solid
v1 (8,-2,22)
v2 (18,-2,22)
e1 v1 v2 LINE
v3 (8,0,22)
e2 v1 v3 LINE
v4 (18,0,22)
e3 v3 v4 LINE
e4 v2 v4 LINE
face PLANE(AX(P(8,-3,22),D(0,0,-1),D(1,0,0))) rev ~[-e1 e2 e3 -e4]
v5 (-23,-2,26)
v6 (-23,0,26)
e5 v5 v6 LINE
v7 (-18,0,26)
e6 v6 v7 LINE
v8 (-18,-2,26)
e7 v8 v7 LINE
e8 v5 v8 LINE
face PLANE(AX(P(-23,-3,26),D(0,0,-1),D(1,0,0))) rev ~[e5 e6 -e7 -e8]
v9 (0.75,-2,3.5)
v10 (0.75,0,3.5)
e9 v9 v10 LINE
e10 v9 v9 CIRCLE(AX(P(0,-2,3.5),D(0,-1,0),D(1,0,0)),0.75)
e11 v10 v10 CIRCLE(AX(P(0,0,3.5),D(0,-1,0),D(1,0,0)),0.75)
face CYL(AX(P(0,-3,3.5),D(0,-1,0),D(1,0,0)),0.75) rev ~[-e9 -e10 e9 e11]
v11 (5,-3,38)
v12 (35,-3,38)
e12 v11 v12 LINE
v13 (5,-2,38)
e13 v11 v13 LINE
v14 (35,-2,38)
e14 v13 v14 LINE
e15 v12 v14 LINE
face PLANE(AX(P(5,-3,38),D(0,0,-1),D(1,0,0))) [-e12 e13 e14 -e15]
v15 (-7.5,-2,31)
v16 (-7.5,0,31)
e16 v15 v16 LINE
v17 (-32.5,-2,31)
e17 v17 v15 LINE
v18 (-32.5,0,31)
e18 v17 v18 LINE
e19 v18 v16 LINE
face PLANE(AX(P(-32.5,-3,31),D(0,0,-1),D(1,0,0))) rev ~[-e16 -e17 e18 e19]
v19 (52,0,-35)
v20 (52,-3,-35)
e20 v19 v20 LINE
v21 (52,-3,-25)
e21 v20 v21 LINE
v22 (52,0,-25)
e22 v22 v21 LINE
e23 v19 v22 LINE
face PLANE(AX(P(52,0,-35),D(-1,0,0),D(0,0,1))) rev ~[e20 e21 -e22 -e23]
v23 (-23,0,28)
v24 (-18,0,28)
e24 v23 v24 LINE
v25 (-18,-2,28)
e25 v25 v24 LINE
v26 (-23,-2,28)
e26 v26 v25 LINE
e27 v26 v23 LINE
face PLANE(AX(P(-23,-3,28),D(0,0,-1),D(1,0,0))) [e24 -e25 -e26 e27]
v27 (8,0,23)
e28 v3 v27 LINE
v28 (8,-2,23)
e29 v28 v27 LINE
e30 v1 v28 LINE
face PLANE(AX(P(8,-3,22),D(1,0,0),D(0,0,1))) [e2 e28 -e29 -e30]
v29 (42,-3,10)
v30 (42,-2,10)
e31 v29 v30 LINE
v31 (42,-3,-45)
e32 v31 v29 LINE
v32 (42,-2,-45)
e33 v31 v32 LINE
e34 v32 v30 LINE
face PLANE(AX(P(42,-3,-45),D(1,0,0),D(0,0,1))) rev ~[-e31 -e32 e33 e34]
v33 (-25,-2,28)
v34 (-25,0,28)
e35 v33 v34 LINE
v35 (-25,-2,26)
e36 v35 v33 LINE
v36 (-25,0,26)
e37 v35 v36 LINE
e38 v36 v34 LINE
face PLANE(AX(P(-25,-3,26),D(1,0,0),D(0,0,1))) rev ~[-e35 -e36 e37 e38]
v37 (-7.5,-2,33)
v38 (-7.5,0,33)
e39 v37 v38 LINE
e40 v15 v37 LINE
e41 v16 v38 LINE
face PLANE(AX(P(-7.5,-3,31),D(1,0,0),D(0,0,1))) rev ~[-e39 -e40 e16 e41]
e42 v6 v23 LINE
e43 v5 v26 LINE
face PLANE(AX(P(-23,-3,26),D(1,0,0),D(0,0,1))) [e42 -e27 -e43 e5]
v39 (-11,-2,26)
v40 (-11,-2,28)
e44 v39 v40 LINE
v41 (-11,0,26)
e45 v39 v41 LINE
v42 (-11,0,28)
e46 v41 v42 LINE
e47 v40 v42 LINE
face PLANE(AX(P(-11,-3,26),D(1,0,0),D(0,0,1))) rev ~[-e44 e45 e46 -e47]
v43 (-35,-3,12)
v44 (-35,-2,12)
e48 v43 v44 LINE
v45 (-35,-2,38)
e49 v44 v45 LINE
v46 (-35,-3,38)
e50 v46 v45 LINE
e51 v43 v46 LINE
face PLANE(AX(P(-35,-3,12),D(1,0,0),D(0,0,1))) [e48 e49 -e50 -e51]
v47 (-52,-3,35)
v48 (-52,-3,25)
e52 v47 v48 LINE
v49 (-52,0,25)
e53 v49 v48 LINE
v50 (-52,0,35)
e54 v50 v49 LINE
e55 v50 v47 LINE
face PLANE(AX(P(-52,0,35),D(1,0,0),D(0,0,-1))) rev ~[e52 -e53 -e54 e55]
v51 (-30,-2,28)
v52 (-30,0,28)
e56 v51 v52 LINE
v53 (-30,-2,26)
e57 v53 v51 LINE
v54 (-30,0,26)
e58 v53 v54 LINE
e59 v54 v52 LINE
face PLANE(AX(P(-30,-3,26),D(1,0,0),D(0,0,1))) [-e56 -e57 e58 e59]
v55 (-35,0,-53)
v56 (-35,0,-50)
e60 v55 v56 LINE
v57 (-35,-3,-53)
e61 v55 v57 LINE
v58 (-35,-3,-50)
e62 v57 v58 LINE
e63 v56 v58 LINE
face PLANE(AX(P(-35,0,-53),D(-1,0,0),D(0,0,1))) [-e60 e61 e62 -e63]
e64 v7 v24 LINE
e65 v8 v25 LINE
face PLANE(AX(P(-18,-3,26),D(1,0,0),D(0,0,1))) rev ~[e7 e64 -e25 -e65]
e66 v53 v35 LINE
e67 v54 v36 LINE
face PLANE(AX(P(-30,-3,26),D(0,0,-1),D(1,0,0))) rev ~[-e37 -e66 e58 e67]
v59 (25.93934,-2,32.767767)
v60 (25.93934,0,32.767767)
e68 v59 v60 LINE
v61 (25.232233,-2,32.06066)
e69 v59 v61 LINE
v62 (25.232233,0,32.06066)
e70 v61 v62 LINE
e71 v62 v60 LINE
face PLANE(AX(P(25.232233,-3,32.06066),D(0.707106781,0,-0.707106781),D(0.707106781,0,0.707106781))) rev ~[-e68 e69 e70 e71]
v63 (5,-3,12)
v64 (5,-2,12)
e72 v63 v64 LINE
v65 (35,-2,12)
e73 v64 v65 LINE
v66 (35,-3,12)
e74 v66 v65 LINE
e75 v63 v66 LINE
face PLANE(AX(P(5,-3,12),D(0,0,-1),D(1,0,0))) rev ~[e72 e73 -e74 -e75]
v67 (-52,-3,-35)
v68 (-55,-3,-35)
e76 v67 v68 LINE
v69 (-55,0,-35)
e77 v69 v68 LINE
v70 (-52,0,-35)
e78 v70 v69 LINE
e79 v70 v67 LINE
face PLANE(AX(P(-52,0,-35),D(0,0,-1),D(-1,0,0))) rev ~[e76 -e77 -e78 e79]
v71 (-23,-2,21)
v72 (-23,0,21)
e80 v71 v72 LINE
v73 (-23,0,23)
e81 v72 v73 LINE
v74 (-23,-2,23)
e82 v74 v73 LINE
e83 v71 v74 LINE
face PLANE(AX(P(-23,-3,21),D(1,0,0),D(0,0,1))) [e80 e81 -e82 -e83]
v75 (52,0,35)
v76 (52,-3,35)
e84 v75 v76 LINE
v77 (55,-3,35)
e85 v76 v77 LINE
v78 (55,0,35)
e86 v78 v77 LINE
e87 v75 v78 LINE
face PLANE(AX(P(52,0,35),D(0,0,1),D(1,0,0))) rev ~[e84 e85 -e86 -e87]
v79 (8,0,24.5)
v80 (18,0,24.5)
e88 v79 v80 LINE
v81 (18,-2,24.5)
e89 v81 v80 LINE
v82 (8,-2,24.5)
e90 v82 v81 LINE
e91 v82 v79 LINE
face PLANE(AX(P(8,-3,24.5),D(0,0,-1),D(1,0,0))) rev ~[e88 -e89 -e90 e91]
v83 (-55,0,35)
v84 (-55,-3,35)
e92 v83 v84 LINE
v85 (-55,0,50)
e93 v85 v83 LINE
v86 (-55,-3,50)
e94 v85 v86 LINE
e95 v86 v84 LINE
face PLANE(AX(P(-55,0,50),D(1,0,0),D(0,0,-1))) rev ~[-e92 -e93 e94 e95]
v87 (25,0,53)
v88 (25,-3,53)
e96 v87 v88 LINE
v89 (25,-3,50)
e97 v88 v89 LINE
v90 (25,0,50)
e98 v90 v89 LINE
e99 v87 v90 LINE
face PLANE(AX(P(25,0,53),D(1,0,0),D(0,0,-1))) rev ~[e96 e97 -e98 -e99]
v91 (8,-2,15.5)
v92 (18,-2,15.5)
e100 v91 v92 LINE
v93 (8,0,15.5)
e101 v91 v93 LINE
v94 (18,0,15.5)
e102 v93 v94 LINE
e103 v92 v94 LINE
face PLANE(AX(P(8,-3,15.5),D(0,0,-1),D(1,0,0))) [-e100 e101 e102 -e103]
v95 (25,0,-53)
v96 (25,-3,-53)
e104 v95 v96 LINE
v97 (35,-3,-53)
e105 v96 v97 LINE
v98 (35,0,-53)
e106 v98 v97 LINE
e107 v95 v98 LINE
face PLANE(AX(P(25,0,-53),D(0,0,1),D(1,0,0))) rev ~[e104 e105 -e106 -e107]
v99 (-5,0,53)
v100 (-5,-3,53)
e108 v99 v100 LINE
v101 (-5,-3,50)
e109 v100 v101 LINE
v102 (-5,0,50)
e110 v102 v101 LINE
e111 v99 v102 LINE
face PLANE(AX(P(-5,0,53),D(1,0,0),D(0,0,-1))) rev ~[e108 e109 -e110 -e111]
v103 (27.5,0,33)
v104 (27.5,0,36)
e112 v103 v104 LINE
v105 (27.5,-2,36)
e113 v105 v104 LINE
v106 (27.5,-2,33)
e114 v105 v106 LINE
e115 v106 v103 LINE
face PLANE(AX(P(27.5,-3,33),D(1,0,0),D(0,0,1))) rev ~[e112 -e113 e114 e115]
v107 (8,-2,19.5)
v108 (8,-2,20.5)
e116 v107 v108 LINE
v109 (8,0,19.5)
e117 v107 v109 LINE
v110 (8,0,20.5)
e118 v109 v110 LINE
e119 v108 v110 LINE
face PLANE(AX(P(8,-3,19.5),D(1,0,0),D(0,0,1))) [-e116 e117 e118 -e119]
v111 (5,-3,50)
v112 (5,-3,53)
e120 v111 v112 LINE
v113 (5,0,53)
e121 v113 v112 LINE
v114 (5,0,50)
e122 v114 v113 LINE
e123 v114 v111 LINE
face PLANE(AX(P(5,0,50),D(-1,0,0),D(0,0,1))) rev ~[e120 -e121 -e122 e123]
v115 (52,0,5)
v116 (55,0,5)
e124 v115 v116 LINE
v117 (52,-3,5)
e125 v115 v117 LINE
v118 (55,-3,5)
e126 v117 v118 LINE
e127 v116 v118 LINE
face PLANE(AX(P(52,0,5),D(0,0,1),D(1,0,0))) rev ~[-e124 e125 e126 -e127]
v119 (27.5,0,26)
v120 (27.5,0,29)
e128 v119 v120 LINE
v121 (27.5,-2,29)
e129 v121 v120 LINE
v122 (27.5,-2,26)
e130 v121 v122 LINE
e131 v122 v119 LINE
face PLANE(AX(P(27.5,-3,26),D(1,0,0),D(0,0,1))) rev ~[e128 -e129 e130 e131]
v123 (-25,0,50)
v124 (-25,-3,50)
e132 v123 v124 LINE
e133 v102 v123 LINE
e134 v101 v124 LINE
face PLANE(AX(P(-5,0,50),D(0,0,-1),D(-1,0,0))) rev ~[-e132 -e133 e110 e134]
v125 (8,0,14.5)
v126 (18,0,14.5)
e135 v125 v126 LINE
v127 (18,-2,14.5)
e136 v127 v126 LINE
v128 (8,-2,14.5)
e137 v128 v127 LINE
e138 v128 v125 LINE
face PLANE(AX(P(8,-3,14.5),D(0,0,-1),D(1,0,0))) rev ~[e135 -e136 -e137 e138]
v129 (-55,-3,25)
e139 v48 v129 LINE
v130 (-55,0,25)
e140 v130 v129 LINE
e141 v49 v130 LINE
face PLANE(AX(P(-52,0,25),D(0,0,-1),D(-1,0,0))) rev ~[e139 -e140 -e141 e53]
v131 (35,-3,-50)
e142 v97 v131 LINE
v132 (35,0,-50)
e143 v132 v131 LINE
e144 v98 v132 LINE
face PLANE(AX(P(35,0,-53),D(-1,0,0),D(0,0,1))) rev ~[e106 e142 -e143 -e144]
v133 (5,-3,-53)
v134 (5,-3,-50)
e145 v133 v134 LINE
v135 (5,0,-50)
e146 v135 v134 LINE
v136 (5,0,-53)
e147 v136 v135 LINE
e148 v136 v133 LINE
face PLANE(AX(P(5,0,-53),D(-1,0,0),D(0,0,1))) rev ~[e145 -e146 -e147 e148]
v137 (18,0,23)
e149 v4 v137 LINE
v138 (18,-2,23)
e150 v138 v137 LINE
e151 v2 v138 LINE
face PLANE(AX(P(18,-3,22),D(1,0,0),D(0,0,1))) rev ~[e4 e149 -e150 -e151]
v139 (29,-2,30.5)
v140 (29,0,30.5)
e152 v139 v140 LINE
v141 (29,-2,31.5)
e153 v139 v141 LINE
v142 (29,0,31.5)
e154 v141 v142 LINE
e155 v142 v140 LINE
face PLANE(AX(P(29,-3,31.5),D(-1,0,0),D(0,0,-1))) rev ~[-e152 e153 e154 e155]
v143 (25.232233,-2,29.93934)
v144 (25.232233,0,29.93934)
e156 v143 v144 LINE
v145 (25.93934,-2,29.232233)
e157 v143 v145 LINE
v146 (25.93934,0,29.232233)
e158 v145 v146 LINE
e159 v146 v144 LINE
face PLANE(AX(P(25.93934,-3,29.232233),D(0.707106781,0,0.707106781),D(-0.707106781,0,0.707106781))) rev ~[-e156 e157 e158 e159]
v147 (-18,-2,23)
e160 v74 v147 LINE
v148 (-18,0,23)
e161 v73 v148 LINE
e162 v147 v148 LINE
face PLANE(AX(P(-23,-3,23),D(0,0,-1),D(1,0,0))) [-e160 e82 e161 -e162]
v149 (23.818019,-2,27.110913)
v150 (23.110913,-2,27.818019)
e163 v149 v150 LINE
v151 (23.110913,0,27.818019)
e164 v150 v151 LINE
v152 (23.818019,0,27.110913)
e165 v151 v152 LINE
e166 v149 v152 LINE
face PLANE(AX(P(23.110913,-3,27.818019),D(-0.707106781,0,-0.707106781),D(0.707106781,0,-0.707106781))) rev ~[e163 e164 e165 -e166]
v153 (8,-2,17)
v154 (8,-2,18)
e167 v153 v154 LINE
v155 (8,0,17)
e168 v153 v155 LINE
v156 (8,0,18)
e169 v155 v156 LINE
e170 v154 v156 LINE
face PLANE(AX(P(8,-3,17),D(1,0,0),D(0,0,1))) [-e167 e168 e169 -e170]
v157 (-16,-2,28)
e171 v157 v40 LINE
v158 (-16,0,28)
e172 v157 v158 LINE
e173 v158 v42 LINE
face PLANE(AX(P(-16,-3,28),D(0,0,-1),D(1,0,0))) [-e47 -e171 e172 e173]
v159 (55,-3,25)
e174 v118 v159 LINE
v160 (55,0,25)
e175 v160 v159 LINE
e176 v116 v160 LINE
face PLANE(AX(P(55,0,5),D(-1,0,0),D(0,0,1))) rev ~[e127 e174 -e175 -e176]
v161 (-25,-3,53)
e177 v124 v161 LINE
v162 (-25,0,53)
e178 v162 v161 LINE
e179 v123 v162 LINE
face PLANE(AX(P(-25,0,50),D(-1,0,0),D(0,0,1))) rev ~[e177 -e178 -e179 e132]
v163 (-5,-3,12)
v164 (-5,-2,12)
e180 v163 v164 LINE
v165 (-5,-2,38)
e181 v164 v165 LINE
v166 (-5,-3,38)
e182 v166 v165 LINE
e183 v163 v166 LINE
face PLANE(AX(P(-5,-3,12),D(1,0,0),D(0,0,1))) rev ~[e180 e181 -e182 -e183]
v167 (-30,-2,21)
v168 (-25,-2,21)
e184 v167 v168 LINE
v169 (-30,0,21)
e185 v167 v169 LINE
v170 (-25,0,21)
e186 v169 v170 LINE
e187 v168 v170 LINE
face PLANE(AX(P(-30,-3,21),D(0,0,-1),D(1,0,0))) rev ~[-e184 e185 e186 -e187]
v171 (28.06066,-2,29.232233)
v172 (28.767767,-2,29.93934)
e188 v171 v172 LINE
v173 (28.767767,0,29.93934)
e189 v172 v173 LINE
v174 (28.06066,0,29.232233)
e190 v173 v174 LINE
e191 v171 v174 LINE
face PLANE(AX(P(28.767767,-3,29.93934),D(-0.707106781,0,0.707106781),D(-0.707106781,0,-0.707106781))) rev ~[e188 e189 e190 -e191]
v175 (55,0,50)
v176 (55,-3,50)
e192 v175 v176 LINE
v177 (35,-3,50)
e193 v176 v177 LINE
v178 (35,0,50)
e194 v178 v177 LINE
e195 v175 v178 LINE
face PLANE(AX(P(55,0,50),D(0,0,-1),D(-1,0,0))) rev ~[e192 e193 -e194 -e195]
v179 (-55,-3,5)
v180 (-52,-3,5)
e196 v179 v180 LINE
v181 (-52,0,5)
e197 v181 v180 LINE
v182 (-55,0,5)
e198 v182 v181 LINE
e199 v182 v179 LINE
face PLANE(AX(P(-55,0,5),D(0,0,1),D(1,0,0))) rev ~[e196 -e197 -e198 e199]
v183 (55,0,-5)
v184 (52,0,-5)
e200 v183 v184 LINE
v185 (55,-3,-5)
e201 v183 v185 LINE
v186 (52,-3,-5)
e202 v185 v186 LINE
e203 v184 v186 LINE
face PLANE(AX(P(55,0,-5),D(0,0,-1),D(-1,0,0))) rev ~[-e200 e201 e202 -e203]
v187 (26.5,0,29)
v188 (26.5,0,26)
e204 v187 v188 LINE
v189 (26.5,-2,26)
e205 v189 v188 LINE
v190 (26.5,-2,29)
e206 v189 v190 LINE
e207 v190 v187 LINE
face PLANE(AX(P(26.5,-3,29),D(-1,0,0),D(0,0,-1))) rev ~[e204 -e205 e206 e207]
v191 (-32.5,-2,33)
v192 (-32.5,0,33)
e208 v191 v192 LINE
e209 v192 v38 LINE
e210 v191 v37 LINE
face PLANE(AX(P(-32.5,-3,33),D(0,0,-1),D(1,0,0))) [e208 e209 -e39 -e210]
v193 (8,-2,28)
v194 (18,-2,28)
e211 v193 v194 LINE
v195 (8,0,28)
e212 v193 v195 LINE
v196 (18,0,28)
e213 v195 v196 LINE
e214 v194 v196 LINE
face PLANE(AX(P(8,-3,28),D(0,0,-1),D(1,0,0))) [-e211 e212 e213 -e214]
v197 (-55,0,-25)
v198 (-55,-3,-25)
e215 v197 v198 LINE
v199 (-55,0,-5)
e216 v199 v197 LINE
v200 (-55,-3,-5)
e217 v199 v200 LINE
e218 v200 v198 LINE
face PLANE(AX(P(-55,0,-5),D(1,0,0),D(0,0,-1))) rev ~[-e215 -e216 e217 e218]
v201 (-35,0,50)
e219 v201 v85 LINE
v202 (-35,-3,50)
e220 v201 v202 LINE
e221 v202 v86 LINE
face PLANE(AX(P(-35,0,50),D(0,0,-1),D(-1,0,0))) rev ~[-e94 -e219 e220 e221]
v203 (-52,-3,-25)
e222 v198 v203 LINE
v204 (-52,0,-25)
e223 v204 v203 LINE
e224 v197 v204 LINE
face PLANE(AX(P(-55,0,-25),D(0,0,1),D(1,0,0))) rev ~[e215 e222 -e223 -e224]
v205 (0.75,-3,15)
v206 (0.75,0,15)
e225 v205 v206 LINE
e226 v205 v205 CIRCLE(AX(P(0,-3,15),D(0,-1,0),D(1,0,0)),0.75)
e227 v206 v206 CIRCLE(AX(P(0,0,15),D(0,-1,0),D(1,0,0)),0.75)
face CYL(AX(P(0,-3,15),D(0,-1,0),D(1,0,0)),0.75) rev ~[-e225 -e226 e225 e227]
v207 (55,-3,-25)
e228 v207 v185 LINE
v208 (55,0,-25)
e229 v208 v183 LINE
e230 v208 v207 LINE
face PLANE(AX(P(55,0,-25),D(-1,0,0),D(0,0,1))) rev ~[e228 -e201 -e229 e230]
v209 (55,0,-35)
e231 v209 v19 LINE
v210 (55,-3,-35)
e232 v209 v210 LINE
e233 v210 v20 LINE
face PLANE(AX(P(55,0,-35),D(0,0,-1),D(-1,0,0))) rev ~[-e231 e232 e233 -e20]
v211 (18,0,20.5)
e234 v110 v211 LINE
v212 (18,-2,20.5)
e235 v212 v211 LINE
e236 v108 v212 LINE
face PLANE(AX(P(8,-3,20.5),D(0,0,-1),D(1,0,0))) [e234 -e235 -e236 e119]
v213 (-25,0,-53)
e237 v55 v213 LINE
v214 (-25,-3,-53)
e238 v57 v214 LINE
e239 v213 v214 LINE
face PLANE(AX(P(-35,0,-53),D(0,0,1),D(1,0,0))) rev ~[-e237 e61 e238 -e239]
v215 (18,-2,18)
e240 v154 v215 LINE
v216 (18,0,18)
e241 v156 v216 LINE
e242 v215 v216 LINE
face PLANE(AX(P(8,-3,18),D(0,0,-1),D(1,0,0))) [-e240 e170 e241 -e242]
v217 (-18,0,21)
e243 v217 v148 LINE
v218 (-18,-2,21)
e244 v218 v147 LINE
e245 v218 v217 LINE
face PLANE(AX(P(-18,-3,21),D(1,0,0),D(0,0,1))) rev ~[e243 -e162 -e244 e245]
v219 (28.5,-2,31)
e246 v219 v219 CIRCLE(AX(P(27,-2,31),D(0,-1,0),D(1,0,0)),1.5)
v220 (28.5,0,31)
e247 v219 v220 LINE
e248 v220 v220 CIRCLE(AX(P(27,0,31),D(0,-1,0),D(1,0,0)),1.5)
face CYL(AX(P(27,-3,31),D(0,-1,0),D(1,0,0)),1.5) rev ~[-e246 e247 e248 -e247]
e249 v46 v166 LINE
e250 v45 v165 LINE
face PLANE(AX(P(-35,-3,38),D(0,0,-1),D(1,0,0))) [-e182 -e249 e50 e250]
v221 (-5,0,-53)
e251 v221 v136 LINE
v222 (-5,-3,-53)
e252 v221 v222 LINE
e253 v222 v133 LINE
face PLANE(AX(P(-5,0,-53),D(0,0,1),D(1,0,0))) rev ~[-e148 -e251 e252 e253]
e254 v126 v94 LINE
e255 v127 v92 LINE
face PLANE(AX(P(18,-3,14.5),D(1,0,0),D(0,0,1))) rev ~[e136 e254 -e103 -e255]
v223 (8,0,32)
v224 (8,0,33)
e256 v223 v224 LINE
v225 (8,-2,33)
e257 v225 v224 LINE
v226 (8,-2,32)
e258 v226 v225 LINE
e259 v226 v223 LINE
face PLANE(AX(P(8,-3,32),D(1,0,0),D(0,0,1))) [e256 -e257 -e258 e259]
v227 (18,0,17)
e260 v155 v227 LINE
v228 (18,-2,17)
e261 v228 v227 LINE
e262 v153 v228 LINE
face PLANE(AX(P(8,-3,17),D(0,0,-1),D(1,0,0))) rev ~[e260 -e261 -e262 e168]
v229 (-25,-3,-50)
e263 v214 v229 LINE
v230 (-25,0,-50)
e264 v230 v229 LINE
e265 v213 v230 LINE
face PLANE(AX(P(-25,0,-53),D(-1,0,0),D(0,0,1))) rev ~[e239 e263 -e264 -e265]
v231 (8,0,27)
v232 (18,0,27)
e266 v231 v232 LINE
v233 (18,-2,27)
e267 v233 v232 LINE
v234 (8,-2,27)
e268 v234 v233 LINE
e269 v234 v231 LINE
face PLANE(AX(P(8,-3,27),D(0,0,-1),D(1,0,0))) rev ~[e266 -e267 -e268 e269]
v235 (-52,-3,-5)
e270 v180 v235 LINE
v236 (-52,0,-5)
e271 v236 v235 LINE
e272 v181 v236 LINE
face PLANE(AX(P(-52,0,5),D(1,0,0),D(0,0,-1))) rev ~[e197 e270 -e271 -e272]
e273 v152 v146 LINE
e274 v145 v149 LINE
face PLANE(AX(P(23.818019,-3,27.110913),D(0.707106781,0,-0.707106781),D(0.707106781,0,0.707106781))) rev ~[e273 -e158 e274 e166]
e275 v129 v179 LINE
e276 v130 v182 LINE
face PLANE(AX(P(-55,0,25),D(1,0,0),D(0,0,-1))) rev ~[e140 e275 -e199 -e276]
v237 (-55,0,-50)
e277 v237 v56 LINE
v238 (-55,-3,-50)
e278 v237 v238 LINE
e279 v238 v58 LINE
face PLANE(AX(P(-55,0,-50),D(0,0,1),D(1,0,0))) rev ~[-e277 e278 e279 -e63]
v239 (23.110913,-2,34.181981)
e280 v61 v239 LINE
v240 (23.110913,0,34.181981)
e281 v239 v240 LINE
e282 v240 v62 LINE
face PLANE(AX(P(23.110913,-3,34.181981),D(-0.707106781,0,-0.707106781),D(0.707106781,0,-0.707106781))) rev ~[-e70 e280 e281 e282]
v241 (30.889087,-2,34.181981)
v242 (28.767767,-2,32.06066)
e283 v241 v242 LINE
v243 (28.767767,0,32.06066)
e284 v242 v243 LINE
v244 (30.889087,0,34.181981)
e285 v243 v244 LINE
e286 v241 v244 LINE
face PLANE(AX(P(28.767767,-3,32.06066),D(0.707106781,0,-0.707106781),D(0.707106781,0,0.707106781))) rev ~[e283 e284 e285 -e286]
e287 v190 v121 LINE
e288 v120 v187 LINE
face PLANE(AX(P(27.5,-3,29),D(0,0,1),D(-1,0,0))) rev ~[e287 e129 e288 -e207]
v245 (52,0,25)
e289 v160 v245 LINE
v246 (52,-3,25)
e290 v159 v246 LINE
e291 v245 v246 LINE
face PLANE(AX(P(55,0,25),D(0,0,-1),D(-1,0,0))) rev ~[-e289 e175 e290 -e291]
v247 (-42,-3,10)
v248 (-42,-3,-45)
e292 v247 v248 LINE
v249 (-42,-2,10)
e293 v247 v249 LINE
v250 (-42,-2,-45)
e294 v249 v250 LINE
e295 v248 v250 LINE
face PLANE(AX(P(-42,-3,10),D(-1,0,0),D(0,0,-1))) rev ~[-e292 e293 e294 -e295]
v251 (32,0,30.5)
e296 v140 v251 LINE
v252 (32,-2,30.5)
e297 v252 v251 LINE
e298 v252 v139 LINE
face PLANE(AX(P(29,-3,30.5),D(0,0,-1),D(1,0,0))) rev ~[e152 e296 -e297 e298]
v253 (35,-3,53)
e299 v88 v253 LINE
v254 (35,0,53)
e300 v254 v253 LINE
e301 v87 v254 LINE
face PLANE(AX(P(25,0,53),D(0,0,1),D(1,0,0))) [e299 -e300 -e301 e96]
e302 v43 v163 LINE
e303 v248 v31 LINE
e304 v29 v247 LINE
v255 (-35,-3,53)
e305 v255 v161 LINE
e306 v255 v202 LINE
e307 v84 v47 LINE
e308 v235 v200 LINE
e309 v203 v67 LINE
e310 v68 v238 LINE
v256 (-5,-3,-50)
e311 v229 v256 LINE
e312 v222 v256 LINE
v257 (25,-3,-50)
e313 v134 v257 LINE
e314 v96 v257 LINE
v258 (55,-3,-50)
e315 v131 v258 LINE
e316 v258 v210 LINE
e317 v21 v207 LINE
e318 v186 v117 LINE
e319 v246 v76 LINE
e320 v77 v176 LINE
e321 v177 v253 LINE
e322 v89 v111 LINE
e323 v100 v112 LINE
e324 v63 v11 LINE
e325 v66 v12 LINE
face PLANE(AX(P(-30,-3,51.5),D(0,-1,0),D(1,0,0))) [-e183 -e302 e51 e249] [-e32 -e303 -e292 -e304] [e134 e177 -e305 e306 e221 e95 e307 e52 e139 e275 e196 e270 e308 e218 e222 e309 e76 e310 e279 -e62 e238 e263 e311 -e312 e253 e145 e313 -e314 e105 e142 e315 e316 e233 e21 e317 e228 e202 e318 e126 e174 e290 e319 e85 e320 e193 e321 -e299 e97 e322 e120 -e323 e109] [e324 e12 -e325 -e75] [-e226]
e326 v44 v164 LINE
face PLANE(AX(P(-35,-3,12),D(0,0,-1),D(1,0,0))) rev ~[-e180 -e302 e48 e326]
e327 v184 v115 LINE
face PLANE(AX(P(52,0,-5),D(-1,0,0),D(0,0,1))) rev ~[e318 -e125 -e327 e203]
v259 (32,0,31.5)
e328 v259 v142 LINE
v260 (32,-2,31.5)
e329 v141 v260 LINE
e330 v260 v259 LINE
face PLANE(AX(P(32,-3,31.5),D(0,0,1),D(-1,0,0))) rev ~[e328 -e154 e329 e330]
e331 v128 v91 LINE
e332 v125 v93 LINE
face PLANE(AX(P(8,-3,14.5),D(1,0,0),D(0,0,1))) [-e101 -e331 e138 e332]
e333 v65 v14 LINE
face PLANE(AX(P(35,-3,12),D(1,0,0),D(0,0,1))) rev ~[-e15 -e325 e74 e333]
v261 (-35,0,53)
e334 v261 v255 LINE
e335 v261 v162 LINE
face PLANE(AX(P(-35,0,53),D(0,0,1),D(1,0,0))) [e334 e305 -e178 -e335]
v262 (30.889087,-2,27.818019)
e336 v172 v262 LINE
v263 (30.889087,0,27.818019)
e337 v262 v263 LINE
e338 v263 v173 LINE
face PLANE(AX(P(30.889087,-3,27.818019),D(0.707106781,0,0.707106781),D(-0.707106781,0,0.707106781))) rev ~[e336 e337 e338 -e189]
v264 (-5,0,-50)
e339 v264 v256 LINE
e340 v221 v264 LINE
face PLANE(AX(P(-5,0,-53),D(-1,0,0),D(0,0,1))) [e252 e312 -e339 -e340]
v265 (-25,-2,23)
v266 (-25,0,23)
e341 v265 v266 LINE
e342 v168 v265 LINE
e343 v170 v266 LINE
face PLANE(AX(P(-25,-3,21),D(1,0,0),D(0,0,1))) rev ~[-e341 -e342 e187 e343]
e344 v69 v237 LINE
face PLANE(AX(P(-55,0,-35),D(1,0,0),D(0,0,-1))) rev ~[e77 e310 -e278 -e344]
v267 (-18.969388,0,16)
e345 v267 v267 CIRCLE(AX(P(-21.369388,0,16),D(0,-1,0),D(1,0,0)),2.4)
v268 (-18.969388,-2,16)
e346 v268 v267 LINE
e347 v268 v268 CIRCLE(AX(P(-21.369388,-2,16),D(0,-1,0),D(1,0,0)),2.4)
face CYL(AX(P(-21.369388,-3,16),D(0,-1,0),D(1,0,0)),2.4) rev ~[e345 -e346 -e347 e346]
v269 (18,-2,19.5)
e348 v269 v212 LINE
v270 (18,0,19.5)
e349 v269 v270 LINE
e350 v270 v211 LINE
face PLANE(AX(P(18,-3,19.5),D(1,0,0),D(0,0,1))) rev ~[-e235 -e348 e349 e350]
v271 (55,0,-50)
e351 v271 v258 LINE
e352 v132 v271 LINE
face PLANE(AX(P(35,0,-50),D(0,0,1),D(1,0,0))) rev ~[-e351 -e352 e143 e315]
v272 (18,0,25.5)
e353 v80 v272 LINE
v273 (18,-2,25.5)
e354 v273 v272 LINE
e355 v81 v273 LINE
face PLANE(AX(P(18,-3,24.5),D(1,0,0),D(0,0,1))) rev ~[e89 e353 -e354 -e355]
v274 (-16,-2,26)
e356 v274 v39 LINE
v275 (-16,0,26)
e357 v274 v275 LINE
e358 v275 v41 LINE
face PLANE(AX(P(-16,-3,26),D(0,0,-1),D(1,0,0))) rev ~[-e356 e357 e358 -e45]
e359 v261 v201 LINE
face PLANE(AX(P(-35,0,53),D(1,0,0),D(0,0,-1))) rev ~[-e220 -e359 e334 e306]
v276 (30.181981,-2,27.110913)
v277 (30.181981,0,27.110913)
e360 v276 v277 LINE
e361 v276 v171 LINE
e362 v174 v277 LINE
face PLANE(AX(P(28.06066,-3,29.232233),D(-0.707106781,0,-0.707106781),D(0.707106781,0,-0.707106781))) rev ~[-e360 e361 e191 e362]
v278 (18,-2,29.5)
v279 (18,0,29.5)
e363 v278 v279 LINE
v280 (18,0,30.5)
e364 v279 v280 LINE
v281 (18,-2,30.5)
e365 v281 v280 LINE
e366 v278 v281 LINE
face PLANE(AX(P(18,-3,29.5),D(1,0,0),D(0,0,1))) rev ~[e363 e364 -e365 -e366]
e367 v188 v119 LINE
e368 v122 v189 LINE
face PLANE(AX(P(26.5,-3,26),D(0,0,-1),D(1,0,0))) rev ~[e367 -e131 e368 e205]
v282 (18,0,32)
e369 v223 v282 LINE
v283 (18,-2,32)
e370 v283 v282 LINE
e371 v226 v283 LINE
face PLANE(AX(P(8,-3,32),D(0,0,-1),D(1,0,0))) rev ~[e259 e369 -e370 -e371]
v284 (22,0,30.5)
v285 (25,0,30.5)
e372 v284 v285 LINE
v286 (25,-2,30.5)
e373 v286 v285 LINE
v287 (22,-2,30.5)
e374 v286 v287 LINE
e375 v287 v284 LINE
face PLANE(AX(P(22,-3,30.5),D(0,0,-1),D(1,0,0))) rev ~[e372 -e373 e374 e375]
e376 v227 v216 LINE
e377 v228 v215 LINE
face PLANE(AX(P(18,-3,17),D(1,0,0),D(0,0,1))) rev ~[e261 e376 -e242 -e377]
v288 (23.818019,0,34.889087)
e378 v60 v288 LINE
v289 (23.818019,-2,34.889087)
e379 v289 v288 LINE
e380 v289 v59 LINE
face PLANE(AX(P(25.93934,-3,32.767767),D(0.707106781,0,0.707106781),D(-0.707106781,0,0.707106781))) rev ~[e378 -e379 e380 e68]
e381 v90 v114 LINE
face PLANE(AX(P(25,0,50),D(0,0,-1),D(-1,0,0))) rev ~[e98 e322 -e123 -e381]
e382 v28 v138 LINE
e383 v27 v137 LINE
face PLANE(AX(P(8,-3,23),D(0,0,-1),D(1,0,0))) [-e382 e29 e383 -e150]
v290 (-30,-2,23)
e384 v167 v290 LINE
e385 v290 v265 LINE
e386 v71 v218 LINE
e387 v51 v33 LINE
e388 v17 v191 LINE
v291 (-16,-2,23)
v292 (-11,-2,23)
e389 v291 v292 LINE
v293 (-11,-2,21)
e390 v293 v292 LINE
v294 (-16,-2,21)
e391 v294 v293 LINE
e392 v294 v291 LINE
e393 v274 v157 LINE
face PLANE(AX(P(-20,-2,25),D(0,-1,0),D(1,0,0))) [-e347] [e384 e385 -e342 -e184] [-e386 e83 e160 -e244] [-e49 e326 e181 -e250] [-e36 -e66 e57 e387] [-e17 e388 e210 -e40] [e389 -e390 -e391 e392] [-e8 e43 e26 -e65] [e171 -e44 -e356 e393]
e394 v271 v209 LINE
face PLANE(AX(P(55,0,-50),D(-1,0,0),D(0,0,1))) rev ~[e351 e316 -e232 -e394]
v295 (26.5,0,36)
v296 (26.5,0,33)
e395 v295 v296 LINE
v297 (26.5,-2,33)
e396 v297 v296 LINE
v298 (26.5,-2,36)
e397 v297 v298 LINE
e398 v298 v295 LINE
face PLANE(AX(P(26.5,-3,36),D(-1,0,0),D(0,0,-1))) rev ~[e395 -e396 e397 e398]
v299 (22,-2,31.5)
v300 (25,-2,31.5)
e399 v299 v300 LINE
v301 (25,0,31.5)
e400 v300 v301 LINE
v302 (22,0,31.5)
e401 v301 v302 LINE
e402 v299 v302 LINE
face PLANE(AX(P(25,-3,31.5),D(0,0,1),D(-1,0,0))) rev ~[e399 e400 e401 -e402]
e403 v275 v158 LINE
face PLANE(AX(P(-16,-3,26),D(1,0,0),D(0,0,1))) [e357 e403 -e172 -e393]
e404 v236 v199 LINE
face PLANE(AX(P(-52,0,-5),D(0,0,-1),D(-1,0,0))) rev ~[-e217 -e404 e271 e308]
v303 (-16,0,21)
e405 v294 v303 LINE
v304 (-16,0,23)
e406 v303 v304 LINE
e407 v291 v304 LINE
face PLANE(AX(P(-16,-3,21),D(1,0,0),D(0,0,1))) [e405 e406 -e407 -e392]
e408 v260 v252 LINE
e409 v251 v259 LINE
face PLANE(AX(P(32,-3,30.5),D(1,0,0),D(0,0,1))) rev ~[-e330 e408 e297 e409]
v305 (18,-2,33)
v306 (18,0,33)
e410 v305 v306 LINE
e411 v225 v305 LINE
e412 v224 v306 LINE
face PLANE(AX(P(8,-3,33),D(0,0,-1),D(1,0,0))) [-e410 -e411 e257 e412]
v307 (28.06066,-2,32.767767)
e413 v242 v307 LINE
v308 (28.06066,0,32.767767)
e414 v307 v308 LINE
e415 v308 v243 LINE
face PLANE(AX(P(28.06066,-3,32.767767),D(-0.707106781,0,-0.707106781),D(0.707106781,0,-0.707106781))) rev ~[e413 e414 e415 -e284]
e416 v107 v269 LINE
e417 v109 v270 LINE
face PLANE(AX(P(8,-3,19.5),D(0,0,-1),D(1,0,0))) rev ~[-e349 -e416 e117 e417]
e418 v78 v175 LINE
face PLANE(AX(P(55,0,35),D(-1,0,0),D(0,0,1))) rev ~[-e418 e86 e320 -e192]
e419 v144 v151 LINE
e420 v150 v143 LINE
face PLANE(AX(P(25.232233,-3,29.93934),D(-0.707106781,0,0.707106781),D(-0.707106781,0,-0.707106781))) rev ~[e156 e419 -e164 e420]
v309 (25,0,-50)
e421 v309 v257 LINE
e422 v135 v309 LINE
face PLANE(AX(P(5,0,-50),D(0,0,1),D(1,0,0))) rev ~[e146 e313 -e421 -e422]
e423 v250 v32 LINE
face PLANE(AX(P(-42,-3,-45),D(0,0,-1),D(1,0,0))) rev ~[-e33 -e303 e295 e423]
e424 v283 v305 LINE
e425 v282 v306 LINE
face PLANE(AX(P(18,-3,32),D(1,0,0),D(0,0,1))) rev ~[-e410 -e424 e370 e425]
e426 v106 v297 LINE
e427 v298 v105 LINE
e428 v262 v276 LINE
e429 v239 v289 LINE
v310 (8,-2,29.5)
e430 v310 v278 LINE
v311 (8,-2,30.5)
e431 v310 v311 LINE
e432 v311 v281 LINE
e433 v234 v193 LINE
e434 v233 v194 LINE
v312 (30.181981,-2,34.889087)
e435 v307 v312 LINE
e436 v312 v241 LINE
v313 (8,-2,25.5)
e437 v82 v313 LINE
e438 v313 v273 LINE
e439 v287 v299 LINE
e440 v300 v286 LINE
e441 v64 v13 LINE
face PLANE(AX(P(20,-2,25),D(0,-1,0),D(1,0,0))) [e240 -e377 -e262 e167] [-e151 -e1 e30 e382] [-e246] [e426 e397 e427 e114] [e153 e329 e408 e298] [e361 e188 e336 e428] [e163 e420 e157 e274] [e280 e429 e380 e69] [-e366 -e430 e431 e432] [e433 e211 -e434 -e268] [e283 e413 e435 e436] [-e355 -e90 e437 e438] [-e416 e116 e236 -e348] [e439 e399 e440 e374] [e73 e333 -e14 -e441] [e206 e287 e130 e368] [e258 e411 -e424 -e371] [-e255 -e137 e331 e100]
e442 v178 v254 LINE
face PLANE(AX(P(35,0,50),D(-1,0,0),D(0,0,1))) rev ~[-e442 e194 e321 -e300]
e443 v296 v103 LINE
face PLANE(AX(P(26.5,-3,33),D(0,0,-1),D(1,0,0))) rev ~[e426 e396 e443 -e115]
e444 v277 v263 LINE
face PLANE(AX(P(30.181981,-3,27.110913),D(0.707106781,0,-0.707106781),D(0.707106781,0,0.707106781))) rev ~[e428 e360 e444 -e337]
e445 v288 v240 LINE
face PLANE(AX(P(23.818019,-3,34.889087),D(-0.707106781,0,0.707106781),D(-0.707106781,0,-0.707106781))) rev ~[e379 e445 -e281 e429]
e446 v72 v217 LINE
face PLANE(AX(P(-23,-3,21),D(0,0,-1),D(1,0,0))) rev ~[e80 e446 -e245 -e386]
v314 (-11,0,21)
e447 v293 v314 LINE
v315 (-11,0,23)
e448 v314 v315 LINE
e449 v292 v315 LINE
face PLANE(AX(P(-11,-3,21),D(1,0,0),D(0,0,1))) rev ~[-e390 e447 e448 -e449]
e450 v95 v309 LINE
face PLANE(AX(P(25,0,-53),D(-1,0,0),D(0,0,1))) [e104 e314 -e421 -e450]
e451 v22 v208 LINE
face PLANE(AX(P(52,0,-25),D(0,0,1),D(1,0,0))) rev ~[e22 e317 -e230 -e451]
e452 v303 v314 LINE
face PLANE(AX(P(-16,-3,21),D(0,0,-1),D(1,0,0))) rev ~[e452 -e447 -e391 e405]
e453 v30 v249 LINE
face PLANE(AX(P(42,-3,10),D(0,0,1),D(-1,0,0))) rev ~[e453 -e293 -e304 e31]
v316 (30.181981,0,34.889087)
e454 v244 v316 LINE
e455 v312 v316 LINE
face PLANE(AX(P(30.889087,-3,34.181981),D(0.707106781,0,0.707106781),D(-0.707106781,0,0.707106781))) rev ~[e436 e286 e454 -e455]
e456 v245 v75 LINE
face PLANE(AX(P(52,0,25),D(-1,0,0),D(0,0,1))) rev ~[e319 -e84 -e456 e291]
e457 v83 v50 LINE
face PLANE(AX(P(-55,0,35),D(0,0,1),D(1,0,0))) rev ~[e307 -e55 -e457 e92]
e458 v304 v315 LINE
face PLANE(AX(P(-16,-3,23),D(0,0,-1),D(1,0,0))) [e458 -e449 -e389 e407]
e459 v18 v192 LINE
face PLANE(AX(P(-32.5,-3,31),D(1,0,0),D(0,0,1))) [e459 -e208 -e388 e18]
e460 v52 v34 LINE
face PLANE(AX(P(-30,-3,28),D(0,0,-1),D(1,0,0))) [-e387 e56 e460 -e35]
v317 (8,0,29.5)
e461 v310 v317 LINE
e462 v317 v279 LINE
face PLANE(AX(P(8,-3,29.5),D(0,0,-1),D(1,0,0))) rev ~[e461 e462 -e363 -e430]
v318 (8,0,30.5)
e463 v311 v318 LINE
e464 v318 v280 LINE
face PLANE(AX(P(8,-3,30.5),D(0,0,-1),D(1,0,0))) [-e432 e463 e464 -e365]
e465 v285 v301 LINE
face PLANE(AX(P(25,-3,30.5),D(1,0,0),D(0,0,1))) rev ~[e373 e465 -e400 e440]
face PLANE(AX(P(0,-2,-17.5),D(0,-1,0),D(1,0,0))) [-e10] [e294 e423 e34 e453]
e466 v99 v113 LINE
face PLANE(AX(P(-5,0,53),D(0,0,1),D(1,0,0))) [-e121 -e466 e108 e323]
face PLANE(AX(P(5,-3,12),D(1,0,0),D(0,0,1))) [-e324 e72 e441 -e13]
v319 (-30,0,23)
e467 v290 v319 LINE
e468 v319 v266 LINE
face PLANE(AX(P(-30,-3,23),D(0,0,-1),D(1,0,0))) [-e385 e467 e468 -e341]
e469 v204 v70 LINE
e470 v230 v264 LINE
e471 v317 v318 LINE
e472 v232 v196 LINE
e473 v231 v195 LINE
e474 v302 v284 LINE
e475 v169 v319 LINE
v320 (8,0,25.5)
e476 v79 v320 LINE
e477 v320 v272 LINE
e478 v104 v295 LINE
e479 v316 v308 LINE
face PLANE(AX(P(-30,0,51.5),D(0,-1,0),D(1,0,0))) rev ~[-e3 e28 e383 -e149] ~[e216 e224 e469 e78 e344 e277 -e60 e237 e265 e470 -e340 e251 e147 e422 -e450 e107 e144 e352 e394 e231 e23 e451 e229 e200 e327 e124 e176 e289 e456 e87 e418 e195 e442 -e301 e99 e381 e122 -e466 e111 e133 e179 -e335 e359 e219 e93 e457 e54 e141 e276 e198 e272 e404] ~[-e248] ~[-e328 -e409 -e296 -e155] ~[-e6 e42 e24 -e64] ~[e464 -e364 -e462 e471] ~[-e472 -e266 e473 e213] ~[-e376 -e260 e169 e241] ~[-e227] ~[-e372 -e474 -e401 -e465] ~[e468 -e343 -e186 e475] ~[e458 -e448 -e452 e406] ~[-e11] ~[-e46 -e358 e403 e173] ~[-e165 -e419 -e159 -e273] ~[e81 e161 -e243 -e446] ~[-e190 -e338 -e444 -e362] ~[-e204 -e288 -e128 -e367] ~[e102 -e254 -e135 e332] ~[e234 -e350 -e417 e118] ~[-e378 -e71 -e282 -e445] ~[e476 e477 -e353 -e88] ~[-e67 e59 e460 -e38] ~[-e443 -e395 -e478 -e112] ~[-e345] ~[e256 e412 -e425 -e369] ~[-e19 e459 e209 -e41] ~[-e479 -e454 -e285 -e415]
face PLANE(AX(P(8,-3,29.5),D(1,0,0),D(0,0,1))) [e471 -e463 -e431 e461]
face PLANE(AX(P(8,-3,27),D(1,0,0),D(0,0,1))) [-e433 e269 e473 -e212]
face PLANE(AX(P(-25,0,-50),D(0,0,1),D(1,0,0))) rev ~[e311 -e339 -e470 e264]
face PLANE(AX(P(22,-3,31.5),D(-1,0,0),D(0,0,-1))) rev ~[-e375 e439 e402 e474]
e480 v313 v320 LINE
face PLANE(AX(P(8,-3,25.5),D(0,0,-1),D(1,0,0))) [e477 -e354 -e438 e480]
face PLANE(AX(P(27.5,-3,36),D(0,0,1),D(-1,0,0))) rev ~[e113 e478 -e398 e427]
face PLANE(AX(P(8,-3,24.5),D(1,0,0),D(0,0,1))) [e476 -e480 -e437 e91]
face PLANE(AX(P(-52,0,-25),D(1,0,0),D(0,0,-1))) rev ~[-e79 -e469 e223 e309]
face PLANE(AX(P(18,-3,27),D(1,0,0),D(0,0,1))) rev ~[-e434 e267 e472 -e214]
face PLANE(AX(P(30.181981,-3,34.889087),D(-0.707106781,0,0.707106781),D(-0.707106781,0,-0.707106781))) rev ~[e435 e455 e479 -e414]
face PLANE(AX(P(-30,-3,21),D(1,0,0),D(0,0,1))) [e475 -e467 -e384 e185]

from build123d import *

# Parameters (mm, degrees)
F0_W     = 10
F0_H     = 3
F1_DEPTH = 3
F2_R     = 0.75
F2_W     = 5
F2_H     = 2
F2_R_2   = 2.4
F2_W_2   = 25
F2_W_3   = 10
F2_H_2   = 1
F2_R_3   = 1.5
F3_DEPTH = 3
F2_W_4   = 30
F2_H_3   = 26
F4_DEPTH = 1


# Not quite as in the source:
# - a feature names something its author has since deleted; it is built from what else it names


with BuildPart() as f1:
    # F0 (on Front) → F1 (new body)
    with BuildSketch(Plane.XZ):
        with Locations((-30, 51.5)):
            Rectangle(F0_W, F0_H)
        with Locations((0, 51.5)):
            Rectangle(F0_W, F0_H)
        with Locations((30, 51.5)):
            Rectangle(F0_W, F0_H)
        with Locations((-30, 48.5)):
            Rectangle(F0_W, F0_H)
        with Locations((0, 48.5)):
            Rectangle(F0_W, F0_H)
        with Locations((30, 48.5)):
            Rectangle(F0_W, F0_H)
        Polygon((-35, 50), (-55, 50), (-55, 35), (-52, 35), (-52, 25), (-55, 25), (-55, 5), (-52, 5), (-52, -5), (-55, -5), (-55, -25), (-52, -25), (-52, -35), (-55, -35), (-55, -50), (-35, -50), (-35, -47), (-25, -47), (-25, -50), (-5, -50), (-5, -47), (5, -47), (5, -50), (25, -50), (25, -47), (35, -47), (35, -50), (55, -50), (55, -35), (52, -35), (52, -25), (55, -25), (55, -5), (52, -5), (52, 5), (55, 5), (55, 25), (52, 25), (52, 35), (55, 35), (55, 50), (35, 50), (35, 47), (25, 47), (25, 50), (5, 50), (5, 47), (-5, 47), (-5, 50), (-25, 50), (-25, 47), (-35, 47), align=None)
        with Locations((30, -48.5)):
            Rectangle(F0_W, F0_H)
        with Locations((30, -51.5)):
            Rectangle(F0_W, F0_H)
        with Locations((0, -48.5)):
            Rectangle(F0_W, F0_H)
        with Locations((0, -51.5)):
            Rectangle(F0_W, F0_H)
        with Locations((-30, -48.5)):
            Rectangle(F0_W, F0_H)
        with Locations((-30, -51.5)):
            Rectangle(F0_W, F0_H)
    extrude(amount=F1_DEPTH)

    # F2 (on face) → F3 (cut)
    with BuildSketch(Plane.XZ.offset(3)):
        with Locations((0, 15)):
            Circle(F2_R)
        with Locations((-13.5, 22)):
            Rectangle(F2_W, F2_H)
        with Locations((-20.5, 22)):
            Rectangle(F2_W, F2_H)
        with Locations((-21.369388327, 16)):
            Circle(F2_R_2)
        with Locations((-27.5, 22)):
            Rectangle(F2_W, F2_H)
        with Locations((-27.5, 27)):
            Rectangle(F2_W, F2_H)
        with Locations((-20.5, 27)):
            Rectangle(F2_W, F2_H)
        with Locations((-13.5, 27)):
            Rectangle(F2_W, F2_H)
        with Locations((-20, 32)):
            Rectangle(F2_W_2, F2_H)
        with Locations((13, 32.5)):
            Rectangle(F2_W_3, F2_H_2)
        with Locations((13, 30)):
            Rectangle(F2_W_3, F2_H_2)
        with Locations((13, 27.5)):
            Rectangle(F2_W_3, F2_H_2)
        with Locations((13, 25)):
            Rectangle(F2_W_3, F2_H_2)
        with Locations((13, 22.5)):
            Rectangle(F2_W_3, F2_H_2)
        with Locations((13, 20)):
            Rectangle(F2_W_3, F2_H_2)
        with Locations((13, 17.5)):
            Rectangle(F2_W_3, F2_H_2)
        with Locations((13, 15)):
            Rectangle(F2_W_3, F2_H_2)
        with Locations((0, 3.5)):
            Circle(F2_R)
        Polygon((28.0606601718, 32.767766953), (28.4142135865, 32.4142135383), (28.767766953, 32.0606601718), (30.8890872965, 34.1819805153), (30.1819805153, 34.8890872965), align=None)
        Polygon((26.5, 33), (27, 33), (27.5, 33), (27.5, 36), (26.5, 36), align=None)
        Polygon((25.232233047, 32.0606601718), (25.5857864376, 32.4142135624), (25.9393398282, 32.767766953), (23.8180194847, 34.8890872965), (23.1109127035, 34.1819805153), align=None)
        Polygon((25, 30.5), (25, 31), (25, 31.5), (22, 31.5), (22, 30.5), align=None)
        Polygon((25.9393398282, 29.232233047), (25.5857864376, 29.5857864376), (25.232233047, 29.9393398282), (23.1109127035, 27.8180194847), (23.8180194847, 27.1109127035), align=None)
        Polygon((27.5, 29), (27, 29), (26.5, 29), (26.5, 26), (27.5, 26), align=None)
        Polygon((28.767766953, 29.9393398282), (28.4142135624, 29.5857864376), (28.0606601718, 29.232233047), (30.1819805153, 27.1109127035), (30.8890872965, 27.8180194847), align=None)
        Polygon((29, 31.5), (29, 31), (29, 30.5), (32, 30.5), (32, 31.5), align=None)
        with Locations((27, 31)):
            Circle(F2_R_3)
    extrude(amount=-F3_DEPTH, mode=Mode.SUBTRACT)

    # F2 (on face) → F4 (cut)
    with BuildSketch(Plane.XZ.offset(3)):
        with Locations((20, 25)):
            Rectangle(F2_W_4, F2_H_3)
        with Locations((13, 15)):
            Rectangle(F2_W_3, F2_H_2, mode=Mode.SUBTRACT)
        with Locations((13, 17.5)):
            Rectangle(F2_W_3, F2_H_2, mode=Mode.SUBTRACT)
        with Locations((13, 20)):
            Rectangle(F2_W_3, F2_H_2, mode=Mode.SUBTRACT)
        with Locations((13, 22.5)):
            Rectangle(F2_W_3, F2_H_2, mode=Mode.SUBTRACT)
        with Locations((13, 25)):
            Rectangle(F2_W_3, F2_H_2, mode=Mode.SUBTRACT)
        with Locations((13, 27.5)):
            Rectangle(F2_W_3, F2_H_2, mode=Mode.SUBTRACT)
        with Locations((13, 30)):
            Rectangle(F2_W_3, F2_H_2, mode=Mode.SUBTRACT)
        with Locations((13, 32.5)):
            Rectangle(F2_W_3, F2_H_2, mode=Mode.SUBTRACT)
        Polygon((26.5, 29), (27, 29), (27.5, 29), (27.5, 26), (26.5, 26), align=None, mode=Mode.SUBTRACT)
        Polygon((25.232233047, 29.9393398282), (25.5857864376, 29.5857864376), (25.9393398282, 29.232233047), (23.8180194847, 27.1109127035), (23.1109127035, 27.8180194847), align=None, mode=Mode.SUBTRACT)
        Polygon((25, 31.5), (25, 31), (25, 30.5), (22, 30.5), (22, 31.5), align=None, mode=Mode.SUBTRACT)
        with BuildLine():
            ThreePointArc((28.4142135865, 32.4142135383), (28.8477590715, 31.765366849), (29, 31))
            ThreePointArc((29, 31), (28.847759065, 30.2346331353), (28.4142135624, 29.5857864376))
            ThreePointArc((28.4142135624, 29.5857864376), (27.7653668647, 29.152240935), (27, 29))
            ThreePointArc((27, 29), (26.2346331353, 29.152240935), (25.5857864376, 29.5857864376))
            ThreePointArc((25.5857864376, 29.5857864376), (25.152240935, 30.2346331353), (25, 31))
            ThreePointArc((25, 31), (25.152240935, 31.7653668647), (25.5857864376, 32.4142135624))
            ThreePointArc((25.5857864376, 32.4142135624), (26.2346331353, 32.847759065), (27, 33))
            ThreePointArc((27, 33), (27.7653668805, 32.8477590585), (28.4142135865, 32.4142135383))
        make_face(mode=Mode.SUBTRACT)
        Polygon((25.9393398282, 32.767766953), (25.5857864376, 32.4142135624), (25.232233047, 32.0606601718), (23.1109127035, 34.1819805153), (23.8180194847, 34.8890872965), align=None, mode=Mode.SUBTRACT)
        Polygon((27.5, 33), (27, 33), (26.5, 33), (26.5, 36), (27.5, 36), align=None, mode=Mode.SUBTRACT)
        Polygon((28.0606601718, 29.232233047), (28.4142135624, 29.5857864376), (28.767766953, 29.9393398282), (30.8890872965, 27.8180194847), (30.1819805153, 27.1109127035), align=None, mode=Mode.SUBTRACT)
        Polygon((29, 30.5), (29, 31), (29, 31.5), (32, 31.5), (32, 30.5), align=None, mode=Mode.SUBTRACT)
        Polygon((28.767766953, 32.0606601718), (28.4142135865, 32.4142135383), (28.0606601718, 32.767766953), (30.1819805153, 34.8890872965), (30.8890872965, 34.1819805153), align=None, mode=Mode.SUBTRACT)
        with Locations((-20, 25)):
            Rectangle(F2_W_4, F2_H_3)
        with Locations((-21.369388327, 16)):
            Circle(F2_R_2, mode=Mode.SUBTRACT)
        with Locations((-27.5, 22)):
            Rectangle(F2_W, F2_H, mode=Mode.SUBTRACT)
        with Locations((-20.5, 22)):
            Rectangle(F2_W, F2_H, mode=Mode.SUBTRACT)
        with Locations((-13.5, 22)):
            Rectangle(F2_W, F2_H, mode=Mode.SUBTRACT)
        with Locations((-27.5, 27)):
            Rectangle(F2_W, F2_H, mode=Mode.SUBTRACT)
        with Locations((-20.5, 27)):
            Rectangle(F2_W, F2_H, mode=Mode.SUBTRACT)
        with Locations((-20, 32)):
            Rectangle(F2_W_2, F2_H, mode=Mode.SUBTRACT)
        with Locations((-13.5, 27)):
            Rectangle(F2_W, F2_H, mode=Mode.SUBTRACT)
        with BuildLine():
            ThreePointArc((28.4142135624, 29.5857864376), (28.847759065, 30.2346331353), (29, 31))
            ThreePointArc((29, 31), (28.8477590715, 31.765366849), (28.4142135865, 32.4142135383))
            ThreePointArc((28.4142135865, 32.4142135383), (27.7653668805, 32.8477590585), (27, 33))
            ThreePointArc((27, 33), (26.2346331353, 32.847759065), (25.5857864376, 32.4142135624))
            ThreePointArc((25.5857864376, 32.4142135624), (25.152240935, 31.7653668647), (25, 31))
            ThreePointArc((25, 31), (25.152240935, 30.2346331353), (25.5857864376, 29.5857864376))
            ThreePointArc((25.5857864376, 29.5857864376), (26.2346331353, 29.152240935), (27, 29))
            ThreePointArc((27, 29), (27.7653668647, 29.152240935), (28.4142135624, 29.5857864376))
        make_face()
        with Locations((27, 31)):
            Circle(F2_R_3, mode=Mode.SUBTRACT)
        Polygon((-35, 10), (-42, 10), (-42, -45), (42, -45), (42, 10), (35, 10), (5, 10), (-5, 10), align=None)
        with Locations((0, 3.5)):
            Circle(F2_R, mode=Mode.SUBTRACT)
    extrude(amount=-F4_DEPTH, mode=Mode.SUBTRACT)


solid = f1.part
